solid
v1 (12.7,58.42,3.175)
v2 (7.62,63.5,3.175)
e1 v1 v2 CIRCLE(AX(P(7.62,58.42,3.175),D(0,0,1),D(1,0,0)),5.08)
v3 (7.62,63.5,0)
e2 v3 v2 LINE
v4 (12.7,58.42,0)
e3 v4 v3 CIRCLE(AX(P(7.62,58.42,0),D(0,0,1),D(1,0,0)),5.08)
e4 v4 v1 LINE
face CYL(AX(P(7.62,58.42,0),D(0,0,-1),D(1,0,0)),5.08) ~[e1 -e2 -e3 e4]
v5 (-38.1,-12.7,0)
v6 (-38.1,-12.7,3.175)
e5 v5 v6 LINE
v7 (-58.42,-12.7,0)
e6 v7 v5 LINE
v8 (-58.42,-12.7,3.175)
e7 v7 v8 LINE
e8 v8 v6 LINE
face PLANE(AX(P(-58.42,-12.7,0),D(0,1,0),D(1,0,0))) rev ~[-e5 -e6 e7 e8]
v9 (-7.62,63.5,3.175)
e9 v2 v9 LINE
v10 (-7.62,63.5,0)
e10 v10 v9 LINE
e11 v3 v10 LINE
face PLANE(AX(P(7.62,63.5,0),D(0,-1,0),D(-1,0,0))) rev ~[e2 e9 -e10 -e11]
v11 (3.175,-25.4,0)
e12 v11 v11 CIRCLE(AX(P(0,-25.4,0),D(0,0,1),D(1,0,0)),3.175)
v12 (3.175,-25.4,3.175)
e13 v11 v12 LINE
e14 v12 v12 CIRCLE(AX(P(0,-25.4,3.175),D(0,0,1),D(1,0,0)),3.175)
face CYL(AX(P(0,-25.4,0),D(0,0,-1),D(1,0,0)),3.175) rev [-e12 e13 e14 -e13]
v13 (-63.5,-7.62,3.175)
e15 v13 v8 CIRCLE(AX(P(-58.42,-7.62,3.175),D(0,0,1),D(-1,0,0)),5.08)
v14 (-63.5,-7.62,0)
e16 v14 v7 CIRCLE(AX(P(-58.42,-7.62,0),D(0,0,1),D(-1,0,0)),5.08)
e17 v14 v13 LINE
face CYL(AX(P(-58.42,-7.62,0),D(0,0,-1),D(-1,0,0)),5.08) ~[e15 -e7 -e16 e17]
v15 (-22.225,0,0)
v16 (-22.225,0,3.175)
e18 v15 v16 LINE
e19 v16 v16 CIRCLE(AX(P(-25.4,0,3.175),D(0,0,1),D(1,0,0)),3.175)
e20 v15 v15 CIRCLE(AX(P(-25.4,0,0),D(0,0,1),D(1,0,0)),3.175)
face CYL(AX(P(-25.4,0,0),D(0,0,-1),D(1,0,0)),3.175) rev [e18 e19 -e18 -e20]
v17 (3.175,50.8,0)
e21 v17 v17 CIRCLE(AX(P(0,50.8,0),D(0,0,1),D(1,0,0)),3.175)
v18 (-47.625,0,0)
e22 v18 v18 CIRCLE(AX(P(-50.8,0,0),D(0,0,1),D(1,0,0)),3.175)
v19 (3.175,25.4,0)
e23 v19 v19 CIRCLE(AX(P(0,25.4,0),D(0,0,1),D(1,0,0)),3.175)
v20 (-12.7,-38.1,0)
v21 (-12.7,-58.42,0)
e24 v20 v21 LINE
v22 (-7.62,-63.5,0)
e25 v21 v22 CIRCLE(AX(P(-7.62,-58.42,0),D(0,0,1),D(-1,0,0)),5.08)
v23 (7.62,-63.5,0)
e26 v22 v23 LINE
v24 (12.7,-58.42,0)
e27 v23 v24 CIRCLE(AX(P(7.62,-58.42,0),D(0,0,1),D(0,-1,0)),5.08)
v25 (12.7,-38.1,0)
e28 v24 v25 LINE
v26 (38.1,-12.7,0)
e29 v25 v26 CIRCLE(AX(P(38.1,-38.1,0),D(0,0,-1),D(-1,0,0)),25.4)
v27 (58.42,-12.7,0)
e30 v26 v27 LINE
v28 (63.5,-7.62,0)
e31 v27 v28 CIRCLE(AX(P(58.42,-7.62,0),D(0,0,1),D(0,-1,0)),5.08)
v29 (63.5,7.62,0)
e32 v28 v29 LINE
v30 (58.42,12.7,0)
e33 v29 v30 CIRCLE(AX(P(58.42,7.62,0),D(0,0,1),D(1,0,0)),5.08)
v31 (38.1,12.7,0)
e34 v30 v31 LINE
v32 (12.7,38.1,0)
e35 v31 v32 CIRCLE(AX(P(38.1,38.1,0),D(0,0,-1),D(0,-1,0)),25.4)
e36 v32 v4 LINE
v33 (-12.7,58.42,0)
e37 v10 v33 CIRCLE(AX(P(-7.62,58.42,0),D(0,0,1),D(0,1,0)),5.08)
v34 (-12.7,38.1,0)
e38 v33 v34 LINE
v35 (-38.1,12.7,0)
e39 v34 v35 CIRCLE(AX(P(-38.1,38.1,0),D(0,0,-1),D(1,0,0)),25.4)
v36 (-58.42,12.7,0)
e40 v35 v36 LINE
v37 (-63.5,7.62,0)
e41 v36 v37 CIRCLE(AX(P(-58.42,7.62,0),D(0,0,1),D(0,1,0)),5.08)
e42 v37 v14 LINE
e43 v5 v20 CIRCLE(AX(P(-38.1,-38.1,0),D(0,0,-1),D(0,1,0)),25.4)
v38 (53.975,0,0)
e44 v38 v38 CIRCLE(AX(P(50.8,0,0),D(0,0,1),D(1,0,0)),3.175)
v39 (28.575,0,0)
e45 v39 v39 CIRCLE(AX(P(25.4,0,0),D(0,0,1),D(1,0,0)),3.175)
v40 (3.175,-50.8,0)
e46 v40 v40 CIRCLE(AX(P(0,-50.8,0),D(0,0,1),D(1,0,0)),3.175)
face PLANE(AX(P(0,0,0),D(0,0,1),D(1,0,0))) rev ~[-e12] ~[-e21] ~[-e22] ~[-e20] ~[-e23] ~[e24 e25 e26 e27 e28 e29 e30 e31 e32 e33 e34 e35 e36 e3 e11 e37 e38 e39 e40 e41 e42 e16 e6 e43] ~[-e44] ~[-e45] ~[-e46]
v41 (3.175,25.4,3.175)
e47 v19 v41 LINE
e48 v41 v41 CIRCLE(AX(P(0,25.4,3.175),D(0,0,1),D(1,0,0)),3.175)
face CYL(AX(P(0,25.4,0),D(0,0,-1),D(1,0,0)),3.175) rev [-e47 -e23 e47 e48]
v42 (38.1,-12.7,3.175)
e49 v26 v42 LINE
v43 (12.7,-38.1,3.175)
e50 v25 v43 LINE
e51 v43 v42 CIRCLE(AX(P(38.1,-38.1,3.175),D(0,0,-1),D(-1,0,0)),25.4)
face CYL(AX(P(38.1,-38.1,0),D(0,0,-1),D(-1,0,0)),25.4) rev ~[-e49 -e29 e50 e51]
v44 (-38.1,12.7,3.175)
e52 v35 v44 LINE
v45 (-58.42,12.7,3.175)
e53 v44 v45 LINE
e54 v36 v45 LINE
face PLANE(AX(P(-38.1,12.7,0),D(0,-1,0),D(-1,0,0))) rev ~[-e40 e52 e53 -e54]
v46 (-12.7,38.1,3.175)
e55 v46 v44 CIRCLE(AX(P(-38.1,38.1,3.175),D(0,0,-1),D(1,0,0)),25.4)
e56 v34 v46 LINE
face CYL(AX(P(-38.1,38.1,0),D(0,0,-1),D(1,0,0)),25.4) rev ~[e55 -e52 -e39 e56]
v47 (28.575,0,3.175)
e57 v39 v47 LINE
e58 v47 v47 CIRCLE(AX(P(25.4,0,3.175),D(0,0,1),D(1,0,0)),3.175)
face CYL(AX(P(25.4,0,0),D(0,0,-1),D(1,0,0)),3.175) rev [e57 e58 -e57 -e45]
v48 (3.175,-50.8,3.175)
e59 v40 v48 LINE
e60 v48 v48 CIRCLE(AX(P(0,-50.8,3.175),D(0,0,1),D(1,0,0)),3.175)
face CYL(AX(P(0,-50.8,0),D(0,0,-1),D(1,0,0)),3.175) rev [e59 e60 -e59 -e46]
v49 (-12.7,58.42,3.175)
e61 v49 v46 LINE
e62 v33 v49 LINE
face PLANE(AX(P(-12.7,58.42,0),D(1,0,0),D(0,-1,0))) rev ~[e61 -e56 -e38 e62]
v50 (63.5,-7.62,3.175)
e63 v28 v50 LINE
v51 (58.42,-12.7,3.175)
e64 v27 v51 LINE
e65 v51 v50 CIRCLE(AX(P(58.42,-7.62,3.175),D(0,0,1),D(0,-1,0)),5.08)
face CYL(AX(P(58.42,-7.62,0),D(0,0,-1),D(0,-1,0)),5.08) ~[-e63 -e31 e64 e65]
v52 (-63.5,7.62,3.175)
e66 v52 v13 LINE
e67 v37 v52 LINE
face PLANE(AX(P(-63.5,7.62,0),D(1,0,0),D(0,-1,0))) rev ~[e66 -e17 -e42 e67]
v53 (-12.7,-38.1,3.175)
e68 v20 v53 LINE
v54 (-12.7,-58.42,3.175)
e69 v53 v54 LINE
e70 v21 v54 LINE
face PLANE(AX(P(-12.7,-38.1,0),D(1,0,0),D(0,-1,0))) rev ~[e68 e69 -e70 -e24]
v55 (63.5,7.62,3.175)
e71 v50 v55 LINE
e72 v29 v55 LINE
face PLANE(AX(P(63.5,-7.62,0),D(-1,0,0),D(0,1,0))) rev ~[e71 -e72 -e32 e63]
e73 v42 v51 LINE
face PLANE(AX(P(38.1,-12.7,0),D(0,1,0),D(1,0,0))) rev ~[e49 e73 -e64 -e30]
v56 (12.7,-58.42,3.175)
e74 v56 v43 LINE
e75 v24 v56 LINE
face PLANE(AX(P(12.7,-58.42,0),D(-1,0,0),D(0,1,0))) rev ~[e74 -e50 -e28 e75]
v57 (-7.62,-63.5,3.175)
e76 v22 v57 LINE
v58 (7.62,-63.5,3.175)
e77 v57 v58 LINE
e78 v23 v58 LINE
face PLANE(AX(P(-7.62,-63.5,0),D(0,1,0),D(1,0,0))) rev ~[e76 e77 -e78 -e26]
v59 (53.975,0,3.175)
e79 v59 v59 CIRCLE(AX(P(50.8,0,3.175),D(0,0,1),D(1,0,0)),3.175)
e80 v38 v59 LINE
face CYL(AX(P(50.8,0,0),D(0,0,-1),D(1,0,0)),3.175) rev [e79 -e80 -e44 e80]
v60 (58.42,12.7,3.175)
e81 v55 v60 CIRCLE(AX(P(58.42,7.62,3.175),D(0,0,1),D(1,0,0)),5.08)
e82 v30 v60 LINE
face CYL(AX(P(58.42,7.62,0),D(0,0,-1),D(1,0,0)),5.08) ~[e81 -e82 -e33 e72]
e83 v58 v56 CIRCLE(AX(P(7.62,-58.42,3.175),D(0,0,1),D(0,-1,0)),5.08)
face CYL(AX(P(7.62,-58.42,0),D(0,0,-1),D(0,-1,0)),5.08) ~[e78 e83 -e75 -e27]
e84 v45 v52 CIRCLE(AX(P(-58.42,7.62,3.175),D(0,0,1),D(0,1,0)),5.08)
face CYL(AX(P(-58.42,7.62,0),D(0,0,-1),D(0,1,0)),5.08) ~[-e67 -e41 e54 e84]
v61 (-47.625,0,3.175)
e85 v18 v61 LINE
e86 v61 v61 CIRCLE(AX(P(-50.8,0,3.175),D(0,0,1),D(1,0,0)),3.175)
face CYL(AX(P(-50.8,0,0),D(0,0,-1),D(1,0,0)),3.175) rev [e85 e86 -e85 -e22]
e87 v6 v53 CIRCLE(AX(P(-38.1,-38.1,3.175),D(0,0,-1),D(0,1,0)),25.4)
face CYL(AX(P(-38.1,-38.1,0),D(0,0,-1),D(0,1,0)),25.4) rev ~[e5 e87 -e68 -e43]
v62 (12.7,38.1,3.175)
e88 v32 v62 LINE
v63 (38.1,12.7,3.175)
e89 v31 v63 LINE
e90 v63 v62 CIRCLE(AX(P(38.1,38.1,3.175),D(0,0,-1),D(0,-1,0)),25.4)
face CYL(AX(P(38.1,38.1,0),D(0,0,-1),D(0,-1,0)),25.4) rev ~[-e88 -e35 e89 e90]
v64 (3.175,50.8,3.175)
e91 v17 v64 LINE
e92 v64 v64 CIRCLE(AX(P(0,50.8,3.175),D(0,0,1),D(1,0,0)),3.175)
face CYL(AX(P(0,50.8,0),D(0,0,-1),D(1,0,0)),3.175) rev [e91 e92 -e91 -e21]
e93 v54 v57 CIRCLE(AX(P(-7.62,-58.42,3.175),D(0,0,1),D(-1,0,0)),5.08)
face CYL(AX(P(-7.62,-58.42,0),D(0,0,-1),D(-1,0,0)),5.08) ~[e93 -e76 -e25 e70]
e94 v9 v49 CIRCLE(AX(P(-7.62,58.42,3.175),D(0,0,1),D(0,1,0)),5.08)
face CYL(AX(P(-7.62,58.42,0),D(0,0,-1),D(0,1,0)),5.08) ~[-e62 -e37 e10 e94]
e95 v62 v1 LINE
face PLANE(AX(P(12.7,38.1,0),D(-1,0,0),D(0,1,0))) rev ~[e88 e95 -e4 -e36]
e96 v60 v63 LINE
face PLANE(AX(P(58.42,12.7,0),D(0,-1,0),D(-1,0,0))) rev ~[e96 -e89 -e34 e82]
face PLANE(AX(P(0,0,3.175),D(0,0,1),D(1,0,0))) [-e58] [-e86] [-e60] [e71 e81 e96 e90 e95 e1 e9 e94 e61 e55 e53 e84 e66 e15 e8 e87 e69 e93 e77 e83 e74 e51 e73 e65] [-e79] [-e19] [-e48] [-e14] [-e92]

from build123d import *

# Parameters (mm, degrees)
F0_R     = 3.175
F1_DEPTH = 3.175


# Not quite as in the source:
# - a length typed as a fraction of an inch, garbled in the dataset ("3 / 203.2 mm" for 3/8 in), is restored


with BuildPart() as f1:
    # F0 (on Top) → F1 (new body)
    with BuildSketch(Plane.XY):
        with BuildLine():
            ThreePointArc((-63.5, -7.62), (-62.0121024484, -11.2121024484), (-58.42, -12.7))
            Line((-58.42, -12.7), (-38.1, -12.7))
            ThreePointArc((-38.1, -12.7), (-20.1394877579, -20.1394877579), (-12.7, -38.1))
            Line((-12.7, -38.1), (-12.7, -58.42))
            ThreePointArc((-12.7, -58.42), (-11.2121024484, -62.0121024484), (-7.62, -63.5))
            Line((-7.62, -63.5), (0, -63.5))
            Line((0, -63.5), (7.62, -63.5))
            ThreePointArc((7.62, -63.5), (11.2121024484, -62.0121024484), (12.7, -58.42))
            Line((12.7, -58.42), (12.7, -38.1))
            ThreePointArc((12.7, -38.1), (20.1394877579, -20.1394877579), (38.1, -12.7))
            Line((38.1, -12.7), (58.42, -12.7))
            ThreePointArc((58.42, -12.7), (62.0121024484, -11.2121024484), (63.5, -7.62))
            Line((63.5, -7.62), (63.5, 0))
            Line((63.5, 0), (63.5, 7.62))
            ThreePointArc((63.5, 7.62), (62.0121024484, 11.2121024484), (58.42, 12.7))
            Line((58.42, 12.7), (38.1, 12.7))
            ThreePointArc((38.1, 12.7), (20.1394877579, 20.1394877579), (12.7, 38.1))
            Line((12.7, 38.1), (12.7, 58.42))
            ThreePointArc((12.7, 58.42), (11.2121024484, 62.0121024484), (7.62, 63.5))
            Line((7.62, 63.5), (-7.62, 63.5))
            ThreePointArc((-7.62, 63.5), (-11.2121024484, 62.0121024484), (-12.7, 58.42))
            Line((-12.7, 58.42), (-12.7, 38.1))
            ThreePointArc((-12.7, 38.1), (-20.1394877579, 20.1394877579), (-38.1, 12.7))
            Line((-38.1, 12.7), (-58.42, 12.7))
            ThreePointArc((-58.42, 12.7), (-62.0121024484, 11.2121024484), (-63.5, 7.62))
            Line((-63.5, 7.62), (-63.5, 0))
            Line((-63.5, 0), (-63.5, -7.62))
        make_face()
        with Locations((0, -50.8)):
            Circle(F0_R, mode=Mode.SUBTRACT)
        with Locations((0, -25.4)):
            Circle(F0_R, mode=Mode.SUBTRACT)
        with Locations((-50.8, 0)):
            Circle(F0_R, mode=Mode.SUBTRACT)
        with Locations((-25.4, 0)):
            Circle(F0_R, mode=Mode.SUBTRACT)
        with Locations((25.4, 0)):
            Circle(F0_R, mode=Mode.SUBTRACT)
        with Locations((0, 25.4)):
            Circle(F0_R, mode=Mode.SUBTRACT)
        with Locations((50.8, 0)):
            Circle(F0_R, mode=Mode.SUBTRACT)
        with Locations((0, 50.8)):
            Circle(F0_R, mode=Mode.SUBTRACT)
    extrude(amount=F1_DEPTH)


solid = f1.part
